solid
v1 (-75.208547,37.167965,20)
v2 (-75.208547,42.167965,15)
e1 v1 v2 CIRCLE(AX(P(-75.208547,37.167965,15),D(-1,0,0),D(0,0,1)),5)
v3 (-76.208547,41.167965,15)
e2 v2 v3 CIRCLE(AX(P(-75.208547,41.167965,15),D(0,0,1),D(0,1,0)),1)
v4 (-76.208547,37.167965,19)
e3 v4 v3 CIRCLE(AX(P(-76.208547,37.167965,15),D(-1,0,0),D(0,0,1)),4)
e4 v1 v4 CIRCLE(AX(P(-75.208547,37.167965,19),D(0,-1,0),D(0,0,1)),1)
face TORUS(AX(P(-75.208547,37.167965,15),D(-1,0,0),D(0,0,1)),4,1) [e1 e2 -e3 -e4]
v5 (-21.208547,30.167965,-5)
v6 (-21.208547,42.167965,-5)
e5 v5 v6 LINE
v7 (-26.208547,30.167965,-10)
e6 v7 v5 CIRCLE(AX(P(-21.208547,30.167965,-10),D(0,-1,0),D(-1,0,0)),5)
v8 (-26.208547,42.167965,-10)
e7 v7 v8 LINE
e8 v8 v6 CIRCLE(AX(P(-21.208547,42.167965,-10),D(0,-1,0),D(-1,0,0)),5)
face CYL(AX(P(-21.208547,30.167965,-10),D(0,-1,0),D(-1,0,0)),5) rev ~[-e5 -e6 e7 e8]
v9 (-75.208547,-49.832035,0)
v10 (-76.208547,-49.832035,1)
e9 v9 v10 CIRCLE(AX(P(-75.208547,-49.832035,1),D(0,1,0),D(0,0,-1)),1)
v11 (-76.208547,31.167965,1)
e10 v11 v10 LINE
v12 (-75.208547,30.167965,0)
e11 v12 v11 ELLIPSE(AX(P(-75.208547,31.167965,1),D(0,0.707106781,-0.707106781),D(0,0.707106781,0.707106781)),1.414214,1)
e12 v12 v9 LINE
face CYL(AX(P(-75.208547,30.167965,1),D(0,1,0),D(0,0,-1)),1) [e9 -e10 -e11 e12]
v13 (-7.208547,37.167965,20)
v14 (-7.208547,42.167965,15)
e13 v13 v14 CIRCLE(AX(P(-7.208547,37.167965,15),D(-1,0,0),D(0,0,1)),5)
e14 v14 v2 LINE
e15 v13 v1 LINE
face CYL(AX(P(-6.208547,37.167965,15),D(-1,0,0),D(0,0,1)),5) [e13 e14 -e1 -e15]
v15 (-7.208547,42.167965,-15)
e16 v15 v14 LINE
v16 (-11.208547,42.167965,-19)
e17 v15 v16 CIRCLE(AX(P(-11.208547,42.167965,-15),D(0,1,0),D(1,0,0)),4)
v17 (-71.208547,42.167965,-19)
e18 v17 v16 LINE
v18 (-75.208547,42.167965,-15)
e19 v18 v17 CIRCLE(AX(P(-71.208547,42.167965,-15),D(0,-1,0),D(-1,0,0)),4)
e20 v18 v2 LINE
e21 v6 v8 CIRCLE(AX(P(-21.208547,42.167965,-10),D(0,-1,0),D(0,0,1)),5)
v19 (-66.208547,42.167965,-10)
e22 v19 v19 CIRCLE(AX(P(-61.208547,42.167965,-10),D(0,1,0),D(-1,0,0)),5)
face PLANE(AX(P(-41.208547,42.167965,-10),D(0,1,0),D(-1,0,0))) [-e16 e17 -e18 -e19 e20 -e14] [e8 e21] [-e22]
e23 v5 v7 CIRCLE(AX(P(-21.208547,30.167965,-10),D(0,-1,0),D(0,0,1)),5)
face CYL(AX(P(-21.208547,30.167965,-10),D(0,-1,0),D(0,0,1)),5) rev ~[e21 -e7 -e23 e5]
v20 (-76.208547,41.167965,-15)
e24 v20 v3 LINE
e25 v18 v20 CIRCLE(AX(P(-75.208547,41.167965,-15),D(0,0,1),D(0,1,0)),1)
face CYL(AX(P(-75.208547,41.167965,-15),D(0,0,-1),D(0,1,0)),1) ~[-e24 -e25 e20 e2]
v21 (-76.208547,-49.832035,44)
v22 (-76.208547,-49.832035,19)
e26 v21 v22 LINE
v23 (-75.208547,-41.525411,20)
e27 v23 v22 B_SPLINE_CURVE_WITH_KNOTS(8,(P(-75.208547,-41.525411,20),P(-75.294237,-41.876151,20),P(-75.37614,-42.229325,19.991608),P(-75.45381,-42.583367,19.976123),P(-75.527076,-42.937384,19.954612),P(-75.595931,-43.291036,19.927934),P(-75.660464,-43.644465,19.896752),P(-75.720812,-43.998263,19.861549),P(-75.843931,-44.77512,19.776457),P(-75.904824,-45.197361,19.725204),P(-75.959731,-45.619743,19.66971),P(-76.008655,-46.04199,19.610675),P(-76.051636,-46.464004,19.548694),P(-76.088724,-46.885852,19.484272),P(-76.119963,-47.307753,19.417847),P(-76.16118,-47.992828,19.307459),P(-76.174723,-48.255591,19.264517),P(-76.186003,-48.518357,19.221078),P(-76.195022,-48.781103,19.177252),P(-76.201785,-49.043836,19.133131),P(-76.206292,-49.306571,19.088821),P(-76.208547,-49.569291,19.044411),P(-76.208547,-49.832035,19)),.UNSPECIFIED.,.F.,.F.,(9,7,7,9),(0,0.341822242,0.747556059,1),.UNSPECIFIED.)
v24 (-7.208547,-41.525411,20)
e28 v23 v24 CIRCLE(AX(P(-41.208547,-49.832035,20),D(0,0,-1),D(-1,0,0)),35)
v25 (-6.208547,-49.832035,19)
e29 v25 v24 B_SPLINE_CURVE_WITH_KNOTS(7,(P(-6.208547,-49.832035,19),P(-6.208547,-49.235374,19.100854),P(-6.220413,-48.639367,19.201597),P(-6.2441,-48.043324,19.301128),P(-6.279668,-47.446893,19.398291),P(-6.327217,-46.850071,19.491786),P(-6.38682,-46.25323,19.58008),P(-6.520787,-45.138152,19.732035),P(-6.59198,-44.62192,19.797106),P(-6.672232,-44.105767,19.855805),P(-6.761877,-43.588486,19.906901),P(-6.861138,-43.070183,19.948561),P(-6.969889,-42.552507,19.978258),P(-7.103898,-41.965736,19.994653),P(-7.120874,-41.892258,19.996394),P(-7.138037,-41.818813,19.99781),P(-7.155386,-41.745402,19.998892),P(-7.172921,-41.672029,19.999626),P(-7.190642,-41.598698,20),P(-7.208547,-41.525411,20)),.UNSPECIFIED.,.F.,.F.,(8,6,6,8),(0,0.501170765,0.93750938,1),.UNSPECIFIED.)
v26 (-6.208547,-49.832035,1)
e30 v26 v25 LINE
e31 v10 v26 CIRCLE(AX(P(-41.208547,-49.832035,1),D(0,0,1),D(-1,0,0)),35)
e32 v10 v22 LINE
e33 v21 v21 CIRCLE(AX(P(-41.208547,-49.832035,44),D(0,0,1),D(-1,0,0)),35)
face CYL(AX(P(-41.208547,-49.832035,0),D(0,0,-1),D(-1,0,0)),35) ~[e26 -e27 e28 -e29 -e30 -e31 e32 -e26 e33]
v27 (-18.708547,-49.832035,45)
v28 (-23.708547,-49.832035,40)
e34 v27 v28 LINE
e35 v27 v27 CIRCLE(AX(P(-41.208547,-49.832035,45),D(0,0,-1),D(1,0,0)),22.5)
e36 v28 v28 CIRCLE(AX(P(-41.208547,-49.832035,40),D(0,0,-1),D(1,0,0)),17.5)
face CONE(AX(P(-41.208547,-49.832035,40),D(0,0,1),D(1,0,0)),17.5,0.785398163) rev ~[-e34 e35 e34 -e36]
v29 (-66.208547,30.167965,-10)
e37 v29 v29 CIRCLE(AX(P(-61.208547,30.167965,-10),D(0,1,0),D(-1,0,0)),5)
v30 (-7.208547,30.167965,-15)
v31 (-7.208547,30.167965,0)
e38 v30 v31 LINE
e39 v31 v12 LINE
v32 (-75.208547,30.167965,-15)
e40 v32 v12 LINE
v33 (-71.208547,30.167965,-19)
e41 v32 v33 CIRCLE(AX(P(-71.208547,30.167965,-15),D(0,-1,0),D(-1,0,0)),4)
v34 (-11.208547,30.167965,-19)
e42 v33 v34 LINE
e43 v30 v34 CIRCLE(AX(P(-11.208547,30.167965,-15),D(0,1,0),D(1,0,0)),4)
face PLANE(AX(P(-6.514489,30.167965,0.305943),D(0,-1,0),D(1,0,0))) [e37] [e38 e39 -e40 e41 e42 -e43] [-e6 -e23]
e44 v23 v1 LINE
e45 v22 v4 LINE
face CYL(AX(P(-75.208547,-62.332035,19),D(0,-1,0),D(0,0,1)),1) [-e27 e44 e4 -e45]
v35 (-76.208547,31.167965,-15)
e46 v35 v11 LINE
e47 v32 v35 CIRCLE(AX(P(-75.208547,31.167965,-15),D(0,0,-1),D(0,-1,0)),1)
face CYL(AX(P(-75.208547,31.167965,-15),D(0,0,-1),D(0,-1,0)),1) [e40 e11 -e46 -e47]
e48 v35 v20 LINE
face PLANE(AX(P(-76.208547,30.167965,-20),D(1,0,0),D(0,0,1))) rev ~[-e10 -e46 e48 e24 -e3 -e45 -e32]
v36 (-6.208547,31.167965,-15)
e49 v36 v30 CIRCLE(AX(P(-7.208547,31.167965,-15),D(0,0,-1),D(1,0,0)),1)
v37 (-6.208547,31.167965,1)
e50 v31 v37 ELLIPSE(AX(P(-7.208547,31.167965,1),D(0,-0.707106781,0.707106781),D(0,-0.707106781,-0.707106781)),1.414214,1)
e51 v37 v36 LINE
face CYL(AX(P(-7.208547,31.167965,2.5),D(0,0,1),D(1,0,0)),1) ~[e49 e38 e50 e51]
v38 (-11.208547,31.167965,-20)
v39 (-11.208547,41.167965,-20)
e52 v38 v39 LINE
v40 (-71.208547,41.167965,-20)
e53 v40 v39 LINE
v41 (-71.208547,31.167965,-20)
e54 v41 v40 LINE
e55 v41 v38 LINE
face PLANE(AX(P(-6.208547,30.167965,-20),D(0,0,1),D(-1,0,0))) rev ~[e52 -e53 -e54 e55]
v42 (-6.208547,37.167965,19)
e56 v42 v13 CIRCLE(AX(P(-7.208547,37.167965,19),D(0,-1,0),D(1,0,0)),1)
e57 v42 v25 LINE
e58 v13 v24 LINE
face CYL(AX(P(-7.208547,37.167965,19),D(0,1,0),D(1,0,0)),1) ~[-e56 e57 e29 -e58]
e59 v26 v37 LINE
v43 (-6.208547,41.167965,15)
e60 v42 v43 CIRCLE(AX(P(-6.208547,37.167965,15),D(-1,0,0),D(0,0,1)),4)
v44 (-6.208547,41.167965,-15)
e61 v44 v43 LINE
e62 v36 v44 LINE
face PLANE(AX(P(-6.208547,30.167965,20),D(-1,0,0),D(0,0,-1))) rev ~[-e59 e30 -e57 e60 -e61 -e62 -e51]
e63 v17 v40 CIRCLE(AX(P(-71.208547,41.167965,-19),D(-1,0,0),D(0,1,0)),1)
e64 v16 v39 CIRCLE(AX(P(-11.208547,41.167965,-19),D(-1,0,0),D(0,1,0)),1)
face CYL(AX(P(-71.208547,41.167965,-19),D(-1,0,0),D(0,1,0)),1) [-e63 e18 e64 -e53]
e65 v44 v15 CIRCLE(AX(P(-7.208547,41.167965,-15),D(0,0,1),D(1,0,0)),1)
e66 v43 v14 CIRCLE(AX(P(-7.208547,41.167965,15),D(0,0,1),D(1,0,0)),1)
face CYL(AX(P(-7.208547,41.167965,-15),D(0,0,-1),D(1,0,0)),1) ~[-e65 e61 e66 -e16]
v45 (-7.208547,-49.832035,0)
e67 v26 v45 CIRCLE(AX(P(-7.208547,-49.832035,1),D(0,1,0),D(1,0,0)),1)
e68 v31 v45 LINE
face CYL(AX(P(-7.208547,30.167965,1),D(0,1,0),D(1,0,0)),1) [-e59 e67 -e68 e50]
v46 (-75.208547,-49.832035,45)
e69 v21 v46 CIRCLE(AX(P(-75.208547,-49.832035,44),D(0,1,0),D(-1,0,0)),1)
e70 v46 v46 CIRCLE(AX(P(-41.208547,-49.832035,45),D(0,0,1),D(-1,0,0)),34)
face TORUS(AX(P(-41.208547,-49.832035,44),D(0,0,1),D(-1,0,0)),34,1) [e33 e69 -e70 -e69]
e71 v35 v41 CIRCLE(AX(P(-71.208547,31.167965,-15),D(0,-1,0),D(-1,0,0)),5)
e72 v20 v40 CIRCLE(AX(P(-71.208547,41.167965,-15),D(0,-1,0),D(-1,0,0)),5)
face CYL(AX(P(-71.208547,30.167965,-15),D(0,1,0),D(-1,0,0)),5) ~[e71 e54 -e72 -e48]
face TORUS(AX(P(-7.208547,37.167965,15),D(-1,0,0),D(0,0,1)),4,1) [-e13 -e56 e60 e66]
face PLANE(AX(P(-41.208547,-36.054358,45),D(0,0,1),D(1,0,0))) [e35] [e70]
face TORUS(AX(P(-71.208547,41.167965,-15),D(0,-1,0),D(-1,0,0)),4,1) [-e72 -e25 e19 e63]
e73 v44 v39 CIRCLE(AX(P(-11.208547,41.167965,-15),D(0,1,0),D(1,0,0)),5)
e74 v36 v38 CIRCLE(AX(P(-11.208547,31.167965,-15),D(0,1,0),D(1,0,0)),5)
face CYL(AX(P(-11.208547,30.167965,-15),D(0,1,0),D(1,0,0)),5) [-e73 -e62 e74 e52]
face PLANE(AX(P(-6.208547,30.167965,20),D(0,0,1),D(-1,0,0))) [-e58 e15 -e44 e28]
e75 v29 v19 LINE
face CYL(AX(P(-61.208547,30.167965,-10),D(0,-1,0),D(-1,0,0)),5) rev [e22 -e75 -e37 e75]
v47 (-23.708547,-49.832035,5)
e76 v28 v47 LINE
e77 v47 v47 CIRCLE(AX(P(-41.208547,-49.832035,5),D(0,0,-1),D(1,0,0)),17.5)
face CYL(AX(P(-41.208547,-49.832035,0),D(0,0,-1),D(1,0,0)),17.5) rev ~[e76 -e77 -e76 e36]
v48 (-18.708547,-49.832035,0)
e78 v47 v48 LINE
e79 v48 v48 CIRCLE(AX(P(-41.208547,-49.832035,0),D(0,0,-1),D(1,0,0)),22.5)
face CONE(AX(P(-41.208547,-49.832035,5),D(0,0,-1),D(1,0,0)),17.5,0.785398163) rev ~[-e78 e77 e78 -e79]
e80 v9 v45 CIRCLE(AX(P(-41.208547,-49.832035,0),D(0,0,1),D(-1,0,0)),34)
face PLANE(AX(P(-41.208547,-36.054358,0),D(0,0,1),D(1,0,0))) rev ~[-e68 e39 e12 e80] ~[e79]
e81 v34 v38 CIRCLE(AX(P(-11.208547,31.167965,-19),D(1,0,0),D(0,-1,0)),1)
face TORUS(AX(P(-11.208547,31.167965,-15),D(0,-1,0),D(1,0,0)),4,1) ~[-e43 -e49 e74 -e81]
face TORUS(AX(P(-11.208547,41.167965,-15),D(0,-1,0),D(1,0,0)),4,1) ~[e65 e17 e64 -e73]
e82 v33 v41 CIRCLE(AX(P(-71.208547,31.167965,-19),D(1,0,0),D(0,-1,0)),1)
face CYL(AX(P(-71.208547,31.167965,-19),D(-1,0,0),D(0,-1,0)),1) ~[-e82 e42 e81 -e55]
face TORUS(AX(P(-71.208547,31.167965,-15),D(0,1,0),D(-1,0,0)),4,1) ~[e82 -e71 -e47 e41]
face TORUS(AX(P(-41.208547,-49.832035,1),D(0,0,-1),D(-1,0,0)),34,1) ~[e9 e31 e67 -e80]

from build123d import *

# Parameters (mm, degrees)
F1_DEPTH     = 45
F2_DEPTH     = 20
F3_W         = 70
F3_H         = 20
F3_R         = 5
F4_DEPTH     = 12
F5_SIZE      = 5
F6_SIZE      = 5
F7_R         = 5
F8_T1_DEPTH  = 80
F8_T3_DEPTH  = 60
F8_T5_DEPTH  = 30
F8_T7_DEPTH  = 15
F8_T12_DEPTH = 99.5
F8_S13_R     = 35
F8_T14_DEPTH = 51
F8_T16_ANGLE = 180
F8_T20_DEPTH = 99.5
F8_S21_R     = 35
F8_T22_DEPTH = 51
F8_T24_ANGLE = 90
F8_T26_ANGLE = 90
F8_T28_ANGLE = 90
F8_T30_ANGLE = 90
F8_T32_ANGLE = 90
F8_T34_ANGLE = 90
F8_T39_DEPTH = 82.5
F8_T43_DEPTH = 17.5
F8_T50_DEPTH = 82.5
F8_T54_DEPTH = 17.5
F9_R         = 1


# Not quite as in the source:
# - a fillet or chamfer that OpenCascade refuses, or shapes differently, is made with other operations: its cross-section is extruded or revolved along the edge and cut away or added


with BuildPart() as f1:
    # F0 (on Top) → F1 (new body)
    with BuildSketch(Plane.XY):
        with BuildLine():
            Line((-23.7085466087, -49.8320348561), (-6.2085466087, -49.8320348561))
            ThreePointArc((-6.2085466087, -49.8320348561), (-41.2085466087, -14.8320348561), (-76.2085466087, -49.8320348561))
            Line((-76.2085466087, -49.8320348561), (-58.7085466087, -49.8320348561))
            ThreePointArc((-58.7085466087, -49.8320348561), (-41.2085466087, -32.3320348561), (-23.7085466087, -49.8320348561))
        make_face()
        with BuildLine():
            ThreePointArc((-76.2085466087, -49.8320348561), (-41.2085466087, -84.8320348561), (-6.2085466087, -49.8320348561))
            Line((-6.2085466087, -49.8320348561), (-23.7085466087, -49.8320348561))
            ThreePointArc((-23.7085466087, -49.8320348561), (-41.2085466087, -67.3320348561), (-58.7085466087, -49.8320348561))
            Line((-58.7085466087, -49.8320348561), (-76.2085466087, -49.8320348561))
        make_face()
    extrude(amount=F1_DEPTH)

    # F0 (on Top) → F2 (join)
    with BuildSketch(Plane.XY):
        with BuildLine():
            Line((-23.7085466087, -49.8320348561), (-6.2085466087, -49.8320348561))
            ThreePointArc((-6.2085466087, -49.8320348561), (-41.2085466087, -14.8320348561), (-76.2085466087, -49.8320348561))
            Line((-76.2085466087, -49.8320348561), (-58.7085466087, -49.8320348561))
            ThreePointArc((-58.7085466087, -49.8320348561), (-41.2085466087, -32.3320348561), (-23.7085466087, -49.8320348561))
        make_face()
        with BuildLine():
            ThreePointArc((-76.2085466087, -49.8320348561), (-41.2085466087, -84.8320348561), (-6.2085466087, -49.8320348561))
            Line((-6.2085466087, -49.8320348561), (-23.7085466087, -49.8320348561))
            ThreePointArc((-23.7085466087, -49.8320348561), (-41.2085466087, -67.3320348561), (-58.7085466087, -49.8320348561))
            Line((-58.7085466087, -49.8320348561), (-76.2085466087, -49.8320348561))
        make_face()
        with BuildLine():
            ThreePointArc((-76.2085466087, -49.8320348561), (-41.2085466087, -14.8320348561), (-6.2085466087, -49.8320348561))
            Line((-6.2085466087, -49.8320348561), (-6.2085466087, 30.1679651439))
            Line((-6.2085466087, 30.1679651439), (-76.2085466087, 30.1679651439))
            Line((-76.2085466087, 30.1679651439), (-76.2085466087, -49.8320348561))
        make_face()
    extrude(amount=F2_DEPTH)

    # F3 (on face) → F4 (join)
    with BuildSketch(Plane(origin=(0, 30.1679651439, 0), x_dir=(-1, 0, 0), z_dir=(0, 1, 0))):
        with Locations((41.2085466087, -10)):
            Rectangle(F3_W, F3_H)
        with BuildLine():
            ThreePointArc((21.2085466087, -5), (24.7440805146, -6.4644660941), (26.2085466087, -10))
            ThreePointArc((26.2085466087, -10), (17.6730127028, -13.5355339059), (21.2085466087, -5))
        make_face(mode=Mode.SUBTRACT)
        with Locations((61.2085466087, -10)):
            Circle(F3_R, mode=Mode.SUBTRACT)
        with Locations((41.2085466087, 10)):
            Rectangle(F3_W, F3_H)
    extrude(amount=F4_DEPTH)

    # F5
    f5_edges = [f1.edges().sort_by_distance(p)[0] for p in [
        (-58.708547, -49.832035, 45),
    ]]
    chamfer(f5_edges, length=F5_SIZE)

    # F6
    f6_edges = [f1.edges().sort_by_distance(p)[0] for p in [
        (-58.708547, -49.832035, 0),
    ]]
    chamfer(f6_edges, length=F6_SIZE)

    # F7
    f7_edges = [f1.edges().sort_by_distance(p)[0] for p in [
        (-76.208547, 36.167965, -20),
        (-6.208547, 36.167965, -20),
        (-41.208547, 42.167965, 20),
    ]]
    fillet(f7_edges, radius=F7_R)

    # F8: fillet of radius 1 on 9 edges, made by hand

    # F8_s2 → F8_t1 (cut)
    with BuildSketch(Plane.XZ.offset(-30.1679651439)):
        with BuildLine():
            ThreePointArc((-75.2085466087, 0), (-75.9156533899, 0.2928932188), (-76.2085466087, 1))
            Line((-76.2085466087, 1), (-76.2085466087, 0))
            Line((-76.2085466087, 0), (-75.2085466087, 0))
        make_face()
        with BuildLine():
            ThreePointArc((-6.2085466087, 1), (-6.5014398275, 0.2928932188), (-7.2085466087, 0))
            Line((-7.2085466087, 0), (-6.2085466087, 0))
            Line((-6.2085466087, 0), (-6.2085466087, 1))
        make_face()
    extrude(amount=F8_T1_DEPTH, mode=Mode.SUBTRACT)

    # F8_s4 → F8_t3 (cut)
    with BuildSketch(Plane.YZ.offset(-71.2085466087)):
        with BuildLine():
            ThreePointArc((30.1679651439, -19), (30.4608583627, -19.7071067812), (31.1679651439, -20))
            Line((31.1679651439, -20), (30.1679651439, -20))
            Line((30.1679651439, -20), (30.1679651439, -19))
        make_face()
        with BuildLine():
            ThreePointArc((42.1679651439, -19), (41.8750719251, -19.7071067812), (41.1679651439, -20))
            Line((41.1679651439, -20), (42.1679651439, -20))
            Line((42.1679651439, -20), (42.1679651439, -19))
        make_face()
    extrude(amount=F8_T3_DEPTH, mode=Mode.SUBTRACT)

    # F8_s6 → F8_t5 (cut)
    with BuildSketch(Plane.XY.offset(-15)):
        with BuildLine():
            ThreePointArc((-6.2085466087, 41.1679651439), (-6.5014398275, 41.8750719251), (-7.2085466087, 42.1679651439))
            Line((-7.2085466087, 42.1679651439), (-6.2085466087, 42.1679651439))
            Line((-6.2085466087, 42.1679651439), (-6.2085466087, 41.1679651439))
        make_face()
        with BuildLine():
            ThreePointArc((-75.2085466087, 42.1679651439), (-75.9156533899, 41.8750719251), (-76.2085466087, 41.1679651439))
            Line((-76.2085466087, 41.1679651439), (-76.2085466087, 42.1679651439))
            Line((-76.2085466087, 42.1679651439), (-75.2085466087, 42.1679651439))
        make_face()
    extrude(amount=F8_T5_DEPTH, mode=Mode.SUBTRACT)

    # F8_s8 → F8_t7 (cut)
    with BuildSketch(Plane.XY.offset(-15)):
        with BuildLine():
            ThreePointArc((-75.2085466087, 30.1679651439), (-75.9156533899, 30.4608583627), (-76.2085466087, 31.1679651439))
            Line((-76.2085466087, 31.1679651439), (-76.2085466087, 30.1679651439))
            Line((-76.2085466087, 30.1679651439), (-75.2085466087, 30.1679651439))
        make_face()
        with BuildLine():
            ThreePointArc((-6.2085466087, 31.1679651439), (-6.5014398275, 30.4608583627), (-7.2085466087, 30.1679651439))
            Line((-7.2085466087, 30.1679651439), (-6.2085466087, 30.1679651439))
            Line((-6.2085466087, 30.1679651439), (-6.2085466087, 31.1679651439))
        make_face()
    extrude(amount=F8_T7_DEPTH, mode=Mode.SUBTRACT)


with BuildPart() as f8_tool10:
    # F8_s11 → F8_t12 (new body)
    with BuildSketch(Plane.XZ.offset(62.3320348561)):
        with BuildLine():
            ThreePointArc((-75.2085466087, 20), (-75.9156533899, 19.7071067812), (-76.2085466087, 19))
            Line((-76.2085466087, 19), (-76.2085466087, 20))
            Line((-76.2085466087, 20), (-75.2085466087, 20))
        make_face()
    extrude(amount=-F8_T12_DEPTH)

    # F8_s13 → F8_t14 (cut, symmetric)
    with BuildSketch(Plane.XY.offset(19.5)):
        with Locations((-41.2085466087, -49.8320348561)):
            Circle(F8_S13_R)
    extrude(amount=F8_T14_DEPTH, both=True, mode=Mode.SUBTRACT)


with BuildPart() as f1_1:
    add(f1.part)

    # F8_t9: cut F8_tool10
    add(f8_tool10.part, mode=Mode.SUBTRACT)

    # F8_s15 → F8_t16 (revolve, cut)
    with BuildSketch(Plane.XZ.offset(49.8320348561)):
        with BuildLine():
            ThreePointArc((-76.2085466087, 1), (-75.9156533899, 0.2928932188), (-75.2085466087, 0))
            Line((-75.2085466087, 0), (-76.2085466087, 0))
            Line((-76.2085466087, 0), (-76.2085466087, 1))
        make_face()
    revolve(axis=Axis((-41.2085466087, -49.8320348561, 0), (0, 0, 1)), revolution_arc=F8_T16_ANGLE, mode=Mode.SUBTRACT)


with BuildPart() as f8_tool18:
    # F8_s19 → F8_t20 (new body)
    with BuildSketch(Plane.XZ.offset(-37.1679651439)):
        with BuildLine():
            ThreePointArc((-6.2085466087, 19), (-6.5014398275, 19.7071067812), (-7.2085466087, 20))
            Line((-7.2085466087, 20), (-6.2085466087, 20))
            Line((-6.2085466087, 20), (-6.2085466087, 19))
        make_face()
    extrude(amount=F8_T20_DEPTH)

    # F8_s21 → F8_t22 (cut, symmetric)
    with BuildSketch(Plane.XY.offset(19.5)):
        with Locations((-41.2085466087, -49.8320348561)):
            Circle(F8_S21_R)
    extrude(amount=F8_T22_DEPTH, both=True, mode=Mode.SUBTRACT)


with BuildPart() as f1_2:
    add(f1_1.part)

    # F8_t17: cut F8_tool18
    add(f8_tool18.part, mode=Mode.SUBTRACT)

    # F8_s23 → F8_t24 (revolve, cut)
    with BuildSketch(Plane.XY.offset(-15)):
        with BuildLine():
            ThreePointArc((-75.2085466087, 42.1679651439), (-75.9156533899, 41.8750719251), (-76.2085466087, 41.1679651439))
            Line((-76.2085466087, 41.1679651439), (-76.2085466087, 42.1679651439))
            Line((-76.2085466087, 42.1679651439), (-75.2085466087, 42.1679651439))
        make_face()
    revolve(axis=Axis((-71.2085466087, 42.1679651439, -15), (0, -1, 0)), revolution_arc=F8_T24_ANGLE, mode=Mode.SUBTRACT)

    # F8_s25 → F8_t26 (revolve, cut)
    with BuildSketch(Plane.XZ.offset(-37.1679651439)):
        with BuildLine():
            ThreePointArc((-75.2085466087, 20), (-75.9156533899, 19.7071067812), (-76.2085466087, 19))
            Line((-76.2085466087, 19), (-76.2085466087, 20))
            Line((-76.2085466087, 20), (-75.2085466087, 20))
        make_face()
    revolve(axis=Axis((-76.2085466087, 37.1679651439, 15), (-1, 0, 0)), revolution_arc=F8_T26_ANGLE, mode=Mode.SUBTRACT)

    # F8_s27 → F8_t28 (revolve, cut)
    with BuildSketch(Plane.XZ.offset(-37.1679651439)):
        with BuildLine():
            ThreePointArc((-6.2085466087, 19), (-6.5014398275, 19.7071067812), (-7.2085466087, 20))
            Line((-7.2085466087, 20), (-6.2085466087, 20))
            Line((-6.2085466087, 20), (-6.2085466087, 19))
        make_face()
    revolve(axis=Axis((-6.2085466087, 37.1679651439, 15), (-1, 0, 0)), revolution_arc=F8_T28_ANGLE, mode=Mode.SUBTRACT)

    # F8_s29 → F8_t30 (revolve, cut)
    with BuildSketch(Plane.XY.offset(-15)):
        with BuildLine():
            ThreePointArc((-7.2085466087, 42.1679651439), (-6.5014398275, 41.8750719251), (-6.2085466087, 41.1679651439))
            Line((-6.2085466087, 41.1679651439), (-6.2085466087, 42.1679651439))
            Line((-6.2085466087, 42.1679651439), (-7.2085466087, 42.1679651439))
        make_face()
    revolve(axis=Axis((-11.2085466087, 42.1679651439, -15), (0, 1, 0)), revolution_arc=F8_T30_ANGLE, mode=Mode.SUBTRACT)

    # F8_s31 → F8_t32 (revolve, cut)
    with BuildSketch(Plane.XY.offset(-15)):
        with BuildLine():
            ThreePointArc((-6.2085466087, 31.1679651439), (-6.5014398275, 30.4608583627), (-7.2085466087, 30.1679651439))
            Line((-7.2085466087, 30.1679651439), (-6.2085466087, 30.1679651439))
            Line((-6.2085466087, 30.1679651439), (-6.2085466087, 31.1679651439))
        make_face()
    revolve(axis=Axis((-11.2085466087, 30.1679651439, -15), (0, 1, 0)), revolution_arc=F8_T32_ANGLE, mode=Mode.SUBTRACT)

    # F8_s33 → F8_t34 (revolve, cut)
    with BuildSketch(Plane.XY.offset(-15)):
        with BuildLine():
            ThreePointArc((-75.2085466087, 30.1679651439), (-75.9156533899, 30.4608583627), (-76.2085466087, 31.1679651439))
            Line((-76.2085466087, 31.1679651439), (-76.2085466087, 30.1679651439))
            Line((-76.2085466087, 30.1679651439), (-75.2085466087, 30.1679651439))
        make_face()
    revolve(axis=Axis((-71.2085466087, 30.1679651439, -15), (0, -1, 0)), revolution_arc=F8_T34_ANGLE, mode=Mode.SUBTRACT)


with BuildPart() as f8_tool37:
    # F8_s38 → F8_t39 (new body)
    with BuildSketch(Plane.XZ.offset(-32.6679651439)):
        with BuildLine():
            ThreePointArc((-75.2085466087, 0), (-75.9156533899, 0.2928932188), (-76.2085466087, 1))
            Line((-76.2085466087, 1), (-76.2085466087, 0))
            Line((-76.2085466087, 0), (-75.2085466087, 0))
        make_face()
    extrude(amount=F8_T39_DEPTH)

    split(bisect_by=Plane.XZ.offset(-30.1679651439), keep=Keep.BOTTOM)


with BuildPart() as f8_tool41:
    # F8_s42 → F8_t43 (new body)
    with BuildSketch(Plane.XY.offset(-15)):
        with BuildLine():
            ThreePointArc((-75.2085466087, 30.1679651439), (-75.9156533899, 30.4608583627), (-76.2085466087, 31.1679651439))
            Line((-76.2085466087, 31.1679651439), (-76.2085466087, 30.1679651439))
            Line((-76.2085466087, 30.1679651439), (-75.2085466087, 30.1679651439))
        make_face()
    extrude(amount=F8_T43_DEPTH)

    split(bisect_by=Plane.XY, keep=Keep.TOP)


with BuildPart() as f8_tool37_1:
    add(f8_tool37.part)

    # F8_t45: intersect F8_tool41
    add(f8_tool41.part, mode=Mode.INTERSECT)


with BuildPart() as f1_3:
    add(f1_2.part)

    # F8_t35: cut F8_tool37
    add(f8_tool37_1.part, mode=Mode.SUBTRACT)


with BuildPart() as f8_tool48:
    # F8_s49 → F8_t50 (new body)
    with BuildSketch(Plane.XZ.offset(49.8320348561)):
        with BuildLine():
            ThreePointArc((-6.2085466087, 1), (-6.5014398275, 0.2928932188), (-7.2085466087, 0))
            Line((-7.2085466087, 0), (-6.2085466087, 0))
            Line((-6.2085466087, 0), (-6.2085466087, 1))
        make_face()
    extrude(amount=-F8_T50_DEPTH)

    split(bisect_by=Plane.XZ.offset(-30.1679651439), keep=Keep.BOTTOM)


with BuildPart() as f8_tool52:
    # F8_s53 → F8_t54 (new body)
    with BuildSketch(Plane.XY.offset(2.5)):
        with BuildLine():
            ThreePointArc((-6.2085466087, 31.1679651439), (-6.5014398275, 30.4608583627), (-7.2085466087, 30.1679651439))
            Line((-7.2085466087, 30.1679651439), (-6.2085466087, 30.1679651439))
            Line((-6.2085466087, 30.1679651439), (-6.2085466087, 31.1679651439))
        make_face()
    extrude(amount=-F8_T54_DEPTH)

    split(bisect_by=Plane.XY, keep=Keep.TOP)


with BuildPart() as f8_tool48_1:
    add(f8_tool48.part)

    # F8_t56: intersect F8_tool52
    add(f8_tool52.part, mode=Mode.INTERSECT)


with BuildPart() as f1_4:
    add(f1_3.part)

    # F8_t46: cut F8_tool48
    add(f8_tool48_1.part, mode=Mode.SUBTRACT)

    # F9
    f9_edges = [f1_4.edges().sort_by_distance(p)[0] for p in [
        (-6.208547, -49.832035, 45),
    ]]
    fillet(f9_edges, radius=F9_R)


solid = f1_4.part
